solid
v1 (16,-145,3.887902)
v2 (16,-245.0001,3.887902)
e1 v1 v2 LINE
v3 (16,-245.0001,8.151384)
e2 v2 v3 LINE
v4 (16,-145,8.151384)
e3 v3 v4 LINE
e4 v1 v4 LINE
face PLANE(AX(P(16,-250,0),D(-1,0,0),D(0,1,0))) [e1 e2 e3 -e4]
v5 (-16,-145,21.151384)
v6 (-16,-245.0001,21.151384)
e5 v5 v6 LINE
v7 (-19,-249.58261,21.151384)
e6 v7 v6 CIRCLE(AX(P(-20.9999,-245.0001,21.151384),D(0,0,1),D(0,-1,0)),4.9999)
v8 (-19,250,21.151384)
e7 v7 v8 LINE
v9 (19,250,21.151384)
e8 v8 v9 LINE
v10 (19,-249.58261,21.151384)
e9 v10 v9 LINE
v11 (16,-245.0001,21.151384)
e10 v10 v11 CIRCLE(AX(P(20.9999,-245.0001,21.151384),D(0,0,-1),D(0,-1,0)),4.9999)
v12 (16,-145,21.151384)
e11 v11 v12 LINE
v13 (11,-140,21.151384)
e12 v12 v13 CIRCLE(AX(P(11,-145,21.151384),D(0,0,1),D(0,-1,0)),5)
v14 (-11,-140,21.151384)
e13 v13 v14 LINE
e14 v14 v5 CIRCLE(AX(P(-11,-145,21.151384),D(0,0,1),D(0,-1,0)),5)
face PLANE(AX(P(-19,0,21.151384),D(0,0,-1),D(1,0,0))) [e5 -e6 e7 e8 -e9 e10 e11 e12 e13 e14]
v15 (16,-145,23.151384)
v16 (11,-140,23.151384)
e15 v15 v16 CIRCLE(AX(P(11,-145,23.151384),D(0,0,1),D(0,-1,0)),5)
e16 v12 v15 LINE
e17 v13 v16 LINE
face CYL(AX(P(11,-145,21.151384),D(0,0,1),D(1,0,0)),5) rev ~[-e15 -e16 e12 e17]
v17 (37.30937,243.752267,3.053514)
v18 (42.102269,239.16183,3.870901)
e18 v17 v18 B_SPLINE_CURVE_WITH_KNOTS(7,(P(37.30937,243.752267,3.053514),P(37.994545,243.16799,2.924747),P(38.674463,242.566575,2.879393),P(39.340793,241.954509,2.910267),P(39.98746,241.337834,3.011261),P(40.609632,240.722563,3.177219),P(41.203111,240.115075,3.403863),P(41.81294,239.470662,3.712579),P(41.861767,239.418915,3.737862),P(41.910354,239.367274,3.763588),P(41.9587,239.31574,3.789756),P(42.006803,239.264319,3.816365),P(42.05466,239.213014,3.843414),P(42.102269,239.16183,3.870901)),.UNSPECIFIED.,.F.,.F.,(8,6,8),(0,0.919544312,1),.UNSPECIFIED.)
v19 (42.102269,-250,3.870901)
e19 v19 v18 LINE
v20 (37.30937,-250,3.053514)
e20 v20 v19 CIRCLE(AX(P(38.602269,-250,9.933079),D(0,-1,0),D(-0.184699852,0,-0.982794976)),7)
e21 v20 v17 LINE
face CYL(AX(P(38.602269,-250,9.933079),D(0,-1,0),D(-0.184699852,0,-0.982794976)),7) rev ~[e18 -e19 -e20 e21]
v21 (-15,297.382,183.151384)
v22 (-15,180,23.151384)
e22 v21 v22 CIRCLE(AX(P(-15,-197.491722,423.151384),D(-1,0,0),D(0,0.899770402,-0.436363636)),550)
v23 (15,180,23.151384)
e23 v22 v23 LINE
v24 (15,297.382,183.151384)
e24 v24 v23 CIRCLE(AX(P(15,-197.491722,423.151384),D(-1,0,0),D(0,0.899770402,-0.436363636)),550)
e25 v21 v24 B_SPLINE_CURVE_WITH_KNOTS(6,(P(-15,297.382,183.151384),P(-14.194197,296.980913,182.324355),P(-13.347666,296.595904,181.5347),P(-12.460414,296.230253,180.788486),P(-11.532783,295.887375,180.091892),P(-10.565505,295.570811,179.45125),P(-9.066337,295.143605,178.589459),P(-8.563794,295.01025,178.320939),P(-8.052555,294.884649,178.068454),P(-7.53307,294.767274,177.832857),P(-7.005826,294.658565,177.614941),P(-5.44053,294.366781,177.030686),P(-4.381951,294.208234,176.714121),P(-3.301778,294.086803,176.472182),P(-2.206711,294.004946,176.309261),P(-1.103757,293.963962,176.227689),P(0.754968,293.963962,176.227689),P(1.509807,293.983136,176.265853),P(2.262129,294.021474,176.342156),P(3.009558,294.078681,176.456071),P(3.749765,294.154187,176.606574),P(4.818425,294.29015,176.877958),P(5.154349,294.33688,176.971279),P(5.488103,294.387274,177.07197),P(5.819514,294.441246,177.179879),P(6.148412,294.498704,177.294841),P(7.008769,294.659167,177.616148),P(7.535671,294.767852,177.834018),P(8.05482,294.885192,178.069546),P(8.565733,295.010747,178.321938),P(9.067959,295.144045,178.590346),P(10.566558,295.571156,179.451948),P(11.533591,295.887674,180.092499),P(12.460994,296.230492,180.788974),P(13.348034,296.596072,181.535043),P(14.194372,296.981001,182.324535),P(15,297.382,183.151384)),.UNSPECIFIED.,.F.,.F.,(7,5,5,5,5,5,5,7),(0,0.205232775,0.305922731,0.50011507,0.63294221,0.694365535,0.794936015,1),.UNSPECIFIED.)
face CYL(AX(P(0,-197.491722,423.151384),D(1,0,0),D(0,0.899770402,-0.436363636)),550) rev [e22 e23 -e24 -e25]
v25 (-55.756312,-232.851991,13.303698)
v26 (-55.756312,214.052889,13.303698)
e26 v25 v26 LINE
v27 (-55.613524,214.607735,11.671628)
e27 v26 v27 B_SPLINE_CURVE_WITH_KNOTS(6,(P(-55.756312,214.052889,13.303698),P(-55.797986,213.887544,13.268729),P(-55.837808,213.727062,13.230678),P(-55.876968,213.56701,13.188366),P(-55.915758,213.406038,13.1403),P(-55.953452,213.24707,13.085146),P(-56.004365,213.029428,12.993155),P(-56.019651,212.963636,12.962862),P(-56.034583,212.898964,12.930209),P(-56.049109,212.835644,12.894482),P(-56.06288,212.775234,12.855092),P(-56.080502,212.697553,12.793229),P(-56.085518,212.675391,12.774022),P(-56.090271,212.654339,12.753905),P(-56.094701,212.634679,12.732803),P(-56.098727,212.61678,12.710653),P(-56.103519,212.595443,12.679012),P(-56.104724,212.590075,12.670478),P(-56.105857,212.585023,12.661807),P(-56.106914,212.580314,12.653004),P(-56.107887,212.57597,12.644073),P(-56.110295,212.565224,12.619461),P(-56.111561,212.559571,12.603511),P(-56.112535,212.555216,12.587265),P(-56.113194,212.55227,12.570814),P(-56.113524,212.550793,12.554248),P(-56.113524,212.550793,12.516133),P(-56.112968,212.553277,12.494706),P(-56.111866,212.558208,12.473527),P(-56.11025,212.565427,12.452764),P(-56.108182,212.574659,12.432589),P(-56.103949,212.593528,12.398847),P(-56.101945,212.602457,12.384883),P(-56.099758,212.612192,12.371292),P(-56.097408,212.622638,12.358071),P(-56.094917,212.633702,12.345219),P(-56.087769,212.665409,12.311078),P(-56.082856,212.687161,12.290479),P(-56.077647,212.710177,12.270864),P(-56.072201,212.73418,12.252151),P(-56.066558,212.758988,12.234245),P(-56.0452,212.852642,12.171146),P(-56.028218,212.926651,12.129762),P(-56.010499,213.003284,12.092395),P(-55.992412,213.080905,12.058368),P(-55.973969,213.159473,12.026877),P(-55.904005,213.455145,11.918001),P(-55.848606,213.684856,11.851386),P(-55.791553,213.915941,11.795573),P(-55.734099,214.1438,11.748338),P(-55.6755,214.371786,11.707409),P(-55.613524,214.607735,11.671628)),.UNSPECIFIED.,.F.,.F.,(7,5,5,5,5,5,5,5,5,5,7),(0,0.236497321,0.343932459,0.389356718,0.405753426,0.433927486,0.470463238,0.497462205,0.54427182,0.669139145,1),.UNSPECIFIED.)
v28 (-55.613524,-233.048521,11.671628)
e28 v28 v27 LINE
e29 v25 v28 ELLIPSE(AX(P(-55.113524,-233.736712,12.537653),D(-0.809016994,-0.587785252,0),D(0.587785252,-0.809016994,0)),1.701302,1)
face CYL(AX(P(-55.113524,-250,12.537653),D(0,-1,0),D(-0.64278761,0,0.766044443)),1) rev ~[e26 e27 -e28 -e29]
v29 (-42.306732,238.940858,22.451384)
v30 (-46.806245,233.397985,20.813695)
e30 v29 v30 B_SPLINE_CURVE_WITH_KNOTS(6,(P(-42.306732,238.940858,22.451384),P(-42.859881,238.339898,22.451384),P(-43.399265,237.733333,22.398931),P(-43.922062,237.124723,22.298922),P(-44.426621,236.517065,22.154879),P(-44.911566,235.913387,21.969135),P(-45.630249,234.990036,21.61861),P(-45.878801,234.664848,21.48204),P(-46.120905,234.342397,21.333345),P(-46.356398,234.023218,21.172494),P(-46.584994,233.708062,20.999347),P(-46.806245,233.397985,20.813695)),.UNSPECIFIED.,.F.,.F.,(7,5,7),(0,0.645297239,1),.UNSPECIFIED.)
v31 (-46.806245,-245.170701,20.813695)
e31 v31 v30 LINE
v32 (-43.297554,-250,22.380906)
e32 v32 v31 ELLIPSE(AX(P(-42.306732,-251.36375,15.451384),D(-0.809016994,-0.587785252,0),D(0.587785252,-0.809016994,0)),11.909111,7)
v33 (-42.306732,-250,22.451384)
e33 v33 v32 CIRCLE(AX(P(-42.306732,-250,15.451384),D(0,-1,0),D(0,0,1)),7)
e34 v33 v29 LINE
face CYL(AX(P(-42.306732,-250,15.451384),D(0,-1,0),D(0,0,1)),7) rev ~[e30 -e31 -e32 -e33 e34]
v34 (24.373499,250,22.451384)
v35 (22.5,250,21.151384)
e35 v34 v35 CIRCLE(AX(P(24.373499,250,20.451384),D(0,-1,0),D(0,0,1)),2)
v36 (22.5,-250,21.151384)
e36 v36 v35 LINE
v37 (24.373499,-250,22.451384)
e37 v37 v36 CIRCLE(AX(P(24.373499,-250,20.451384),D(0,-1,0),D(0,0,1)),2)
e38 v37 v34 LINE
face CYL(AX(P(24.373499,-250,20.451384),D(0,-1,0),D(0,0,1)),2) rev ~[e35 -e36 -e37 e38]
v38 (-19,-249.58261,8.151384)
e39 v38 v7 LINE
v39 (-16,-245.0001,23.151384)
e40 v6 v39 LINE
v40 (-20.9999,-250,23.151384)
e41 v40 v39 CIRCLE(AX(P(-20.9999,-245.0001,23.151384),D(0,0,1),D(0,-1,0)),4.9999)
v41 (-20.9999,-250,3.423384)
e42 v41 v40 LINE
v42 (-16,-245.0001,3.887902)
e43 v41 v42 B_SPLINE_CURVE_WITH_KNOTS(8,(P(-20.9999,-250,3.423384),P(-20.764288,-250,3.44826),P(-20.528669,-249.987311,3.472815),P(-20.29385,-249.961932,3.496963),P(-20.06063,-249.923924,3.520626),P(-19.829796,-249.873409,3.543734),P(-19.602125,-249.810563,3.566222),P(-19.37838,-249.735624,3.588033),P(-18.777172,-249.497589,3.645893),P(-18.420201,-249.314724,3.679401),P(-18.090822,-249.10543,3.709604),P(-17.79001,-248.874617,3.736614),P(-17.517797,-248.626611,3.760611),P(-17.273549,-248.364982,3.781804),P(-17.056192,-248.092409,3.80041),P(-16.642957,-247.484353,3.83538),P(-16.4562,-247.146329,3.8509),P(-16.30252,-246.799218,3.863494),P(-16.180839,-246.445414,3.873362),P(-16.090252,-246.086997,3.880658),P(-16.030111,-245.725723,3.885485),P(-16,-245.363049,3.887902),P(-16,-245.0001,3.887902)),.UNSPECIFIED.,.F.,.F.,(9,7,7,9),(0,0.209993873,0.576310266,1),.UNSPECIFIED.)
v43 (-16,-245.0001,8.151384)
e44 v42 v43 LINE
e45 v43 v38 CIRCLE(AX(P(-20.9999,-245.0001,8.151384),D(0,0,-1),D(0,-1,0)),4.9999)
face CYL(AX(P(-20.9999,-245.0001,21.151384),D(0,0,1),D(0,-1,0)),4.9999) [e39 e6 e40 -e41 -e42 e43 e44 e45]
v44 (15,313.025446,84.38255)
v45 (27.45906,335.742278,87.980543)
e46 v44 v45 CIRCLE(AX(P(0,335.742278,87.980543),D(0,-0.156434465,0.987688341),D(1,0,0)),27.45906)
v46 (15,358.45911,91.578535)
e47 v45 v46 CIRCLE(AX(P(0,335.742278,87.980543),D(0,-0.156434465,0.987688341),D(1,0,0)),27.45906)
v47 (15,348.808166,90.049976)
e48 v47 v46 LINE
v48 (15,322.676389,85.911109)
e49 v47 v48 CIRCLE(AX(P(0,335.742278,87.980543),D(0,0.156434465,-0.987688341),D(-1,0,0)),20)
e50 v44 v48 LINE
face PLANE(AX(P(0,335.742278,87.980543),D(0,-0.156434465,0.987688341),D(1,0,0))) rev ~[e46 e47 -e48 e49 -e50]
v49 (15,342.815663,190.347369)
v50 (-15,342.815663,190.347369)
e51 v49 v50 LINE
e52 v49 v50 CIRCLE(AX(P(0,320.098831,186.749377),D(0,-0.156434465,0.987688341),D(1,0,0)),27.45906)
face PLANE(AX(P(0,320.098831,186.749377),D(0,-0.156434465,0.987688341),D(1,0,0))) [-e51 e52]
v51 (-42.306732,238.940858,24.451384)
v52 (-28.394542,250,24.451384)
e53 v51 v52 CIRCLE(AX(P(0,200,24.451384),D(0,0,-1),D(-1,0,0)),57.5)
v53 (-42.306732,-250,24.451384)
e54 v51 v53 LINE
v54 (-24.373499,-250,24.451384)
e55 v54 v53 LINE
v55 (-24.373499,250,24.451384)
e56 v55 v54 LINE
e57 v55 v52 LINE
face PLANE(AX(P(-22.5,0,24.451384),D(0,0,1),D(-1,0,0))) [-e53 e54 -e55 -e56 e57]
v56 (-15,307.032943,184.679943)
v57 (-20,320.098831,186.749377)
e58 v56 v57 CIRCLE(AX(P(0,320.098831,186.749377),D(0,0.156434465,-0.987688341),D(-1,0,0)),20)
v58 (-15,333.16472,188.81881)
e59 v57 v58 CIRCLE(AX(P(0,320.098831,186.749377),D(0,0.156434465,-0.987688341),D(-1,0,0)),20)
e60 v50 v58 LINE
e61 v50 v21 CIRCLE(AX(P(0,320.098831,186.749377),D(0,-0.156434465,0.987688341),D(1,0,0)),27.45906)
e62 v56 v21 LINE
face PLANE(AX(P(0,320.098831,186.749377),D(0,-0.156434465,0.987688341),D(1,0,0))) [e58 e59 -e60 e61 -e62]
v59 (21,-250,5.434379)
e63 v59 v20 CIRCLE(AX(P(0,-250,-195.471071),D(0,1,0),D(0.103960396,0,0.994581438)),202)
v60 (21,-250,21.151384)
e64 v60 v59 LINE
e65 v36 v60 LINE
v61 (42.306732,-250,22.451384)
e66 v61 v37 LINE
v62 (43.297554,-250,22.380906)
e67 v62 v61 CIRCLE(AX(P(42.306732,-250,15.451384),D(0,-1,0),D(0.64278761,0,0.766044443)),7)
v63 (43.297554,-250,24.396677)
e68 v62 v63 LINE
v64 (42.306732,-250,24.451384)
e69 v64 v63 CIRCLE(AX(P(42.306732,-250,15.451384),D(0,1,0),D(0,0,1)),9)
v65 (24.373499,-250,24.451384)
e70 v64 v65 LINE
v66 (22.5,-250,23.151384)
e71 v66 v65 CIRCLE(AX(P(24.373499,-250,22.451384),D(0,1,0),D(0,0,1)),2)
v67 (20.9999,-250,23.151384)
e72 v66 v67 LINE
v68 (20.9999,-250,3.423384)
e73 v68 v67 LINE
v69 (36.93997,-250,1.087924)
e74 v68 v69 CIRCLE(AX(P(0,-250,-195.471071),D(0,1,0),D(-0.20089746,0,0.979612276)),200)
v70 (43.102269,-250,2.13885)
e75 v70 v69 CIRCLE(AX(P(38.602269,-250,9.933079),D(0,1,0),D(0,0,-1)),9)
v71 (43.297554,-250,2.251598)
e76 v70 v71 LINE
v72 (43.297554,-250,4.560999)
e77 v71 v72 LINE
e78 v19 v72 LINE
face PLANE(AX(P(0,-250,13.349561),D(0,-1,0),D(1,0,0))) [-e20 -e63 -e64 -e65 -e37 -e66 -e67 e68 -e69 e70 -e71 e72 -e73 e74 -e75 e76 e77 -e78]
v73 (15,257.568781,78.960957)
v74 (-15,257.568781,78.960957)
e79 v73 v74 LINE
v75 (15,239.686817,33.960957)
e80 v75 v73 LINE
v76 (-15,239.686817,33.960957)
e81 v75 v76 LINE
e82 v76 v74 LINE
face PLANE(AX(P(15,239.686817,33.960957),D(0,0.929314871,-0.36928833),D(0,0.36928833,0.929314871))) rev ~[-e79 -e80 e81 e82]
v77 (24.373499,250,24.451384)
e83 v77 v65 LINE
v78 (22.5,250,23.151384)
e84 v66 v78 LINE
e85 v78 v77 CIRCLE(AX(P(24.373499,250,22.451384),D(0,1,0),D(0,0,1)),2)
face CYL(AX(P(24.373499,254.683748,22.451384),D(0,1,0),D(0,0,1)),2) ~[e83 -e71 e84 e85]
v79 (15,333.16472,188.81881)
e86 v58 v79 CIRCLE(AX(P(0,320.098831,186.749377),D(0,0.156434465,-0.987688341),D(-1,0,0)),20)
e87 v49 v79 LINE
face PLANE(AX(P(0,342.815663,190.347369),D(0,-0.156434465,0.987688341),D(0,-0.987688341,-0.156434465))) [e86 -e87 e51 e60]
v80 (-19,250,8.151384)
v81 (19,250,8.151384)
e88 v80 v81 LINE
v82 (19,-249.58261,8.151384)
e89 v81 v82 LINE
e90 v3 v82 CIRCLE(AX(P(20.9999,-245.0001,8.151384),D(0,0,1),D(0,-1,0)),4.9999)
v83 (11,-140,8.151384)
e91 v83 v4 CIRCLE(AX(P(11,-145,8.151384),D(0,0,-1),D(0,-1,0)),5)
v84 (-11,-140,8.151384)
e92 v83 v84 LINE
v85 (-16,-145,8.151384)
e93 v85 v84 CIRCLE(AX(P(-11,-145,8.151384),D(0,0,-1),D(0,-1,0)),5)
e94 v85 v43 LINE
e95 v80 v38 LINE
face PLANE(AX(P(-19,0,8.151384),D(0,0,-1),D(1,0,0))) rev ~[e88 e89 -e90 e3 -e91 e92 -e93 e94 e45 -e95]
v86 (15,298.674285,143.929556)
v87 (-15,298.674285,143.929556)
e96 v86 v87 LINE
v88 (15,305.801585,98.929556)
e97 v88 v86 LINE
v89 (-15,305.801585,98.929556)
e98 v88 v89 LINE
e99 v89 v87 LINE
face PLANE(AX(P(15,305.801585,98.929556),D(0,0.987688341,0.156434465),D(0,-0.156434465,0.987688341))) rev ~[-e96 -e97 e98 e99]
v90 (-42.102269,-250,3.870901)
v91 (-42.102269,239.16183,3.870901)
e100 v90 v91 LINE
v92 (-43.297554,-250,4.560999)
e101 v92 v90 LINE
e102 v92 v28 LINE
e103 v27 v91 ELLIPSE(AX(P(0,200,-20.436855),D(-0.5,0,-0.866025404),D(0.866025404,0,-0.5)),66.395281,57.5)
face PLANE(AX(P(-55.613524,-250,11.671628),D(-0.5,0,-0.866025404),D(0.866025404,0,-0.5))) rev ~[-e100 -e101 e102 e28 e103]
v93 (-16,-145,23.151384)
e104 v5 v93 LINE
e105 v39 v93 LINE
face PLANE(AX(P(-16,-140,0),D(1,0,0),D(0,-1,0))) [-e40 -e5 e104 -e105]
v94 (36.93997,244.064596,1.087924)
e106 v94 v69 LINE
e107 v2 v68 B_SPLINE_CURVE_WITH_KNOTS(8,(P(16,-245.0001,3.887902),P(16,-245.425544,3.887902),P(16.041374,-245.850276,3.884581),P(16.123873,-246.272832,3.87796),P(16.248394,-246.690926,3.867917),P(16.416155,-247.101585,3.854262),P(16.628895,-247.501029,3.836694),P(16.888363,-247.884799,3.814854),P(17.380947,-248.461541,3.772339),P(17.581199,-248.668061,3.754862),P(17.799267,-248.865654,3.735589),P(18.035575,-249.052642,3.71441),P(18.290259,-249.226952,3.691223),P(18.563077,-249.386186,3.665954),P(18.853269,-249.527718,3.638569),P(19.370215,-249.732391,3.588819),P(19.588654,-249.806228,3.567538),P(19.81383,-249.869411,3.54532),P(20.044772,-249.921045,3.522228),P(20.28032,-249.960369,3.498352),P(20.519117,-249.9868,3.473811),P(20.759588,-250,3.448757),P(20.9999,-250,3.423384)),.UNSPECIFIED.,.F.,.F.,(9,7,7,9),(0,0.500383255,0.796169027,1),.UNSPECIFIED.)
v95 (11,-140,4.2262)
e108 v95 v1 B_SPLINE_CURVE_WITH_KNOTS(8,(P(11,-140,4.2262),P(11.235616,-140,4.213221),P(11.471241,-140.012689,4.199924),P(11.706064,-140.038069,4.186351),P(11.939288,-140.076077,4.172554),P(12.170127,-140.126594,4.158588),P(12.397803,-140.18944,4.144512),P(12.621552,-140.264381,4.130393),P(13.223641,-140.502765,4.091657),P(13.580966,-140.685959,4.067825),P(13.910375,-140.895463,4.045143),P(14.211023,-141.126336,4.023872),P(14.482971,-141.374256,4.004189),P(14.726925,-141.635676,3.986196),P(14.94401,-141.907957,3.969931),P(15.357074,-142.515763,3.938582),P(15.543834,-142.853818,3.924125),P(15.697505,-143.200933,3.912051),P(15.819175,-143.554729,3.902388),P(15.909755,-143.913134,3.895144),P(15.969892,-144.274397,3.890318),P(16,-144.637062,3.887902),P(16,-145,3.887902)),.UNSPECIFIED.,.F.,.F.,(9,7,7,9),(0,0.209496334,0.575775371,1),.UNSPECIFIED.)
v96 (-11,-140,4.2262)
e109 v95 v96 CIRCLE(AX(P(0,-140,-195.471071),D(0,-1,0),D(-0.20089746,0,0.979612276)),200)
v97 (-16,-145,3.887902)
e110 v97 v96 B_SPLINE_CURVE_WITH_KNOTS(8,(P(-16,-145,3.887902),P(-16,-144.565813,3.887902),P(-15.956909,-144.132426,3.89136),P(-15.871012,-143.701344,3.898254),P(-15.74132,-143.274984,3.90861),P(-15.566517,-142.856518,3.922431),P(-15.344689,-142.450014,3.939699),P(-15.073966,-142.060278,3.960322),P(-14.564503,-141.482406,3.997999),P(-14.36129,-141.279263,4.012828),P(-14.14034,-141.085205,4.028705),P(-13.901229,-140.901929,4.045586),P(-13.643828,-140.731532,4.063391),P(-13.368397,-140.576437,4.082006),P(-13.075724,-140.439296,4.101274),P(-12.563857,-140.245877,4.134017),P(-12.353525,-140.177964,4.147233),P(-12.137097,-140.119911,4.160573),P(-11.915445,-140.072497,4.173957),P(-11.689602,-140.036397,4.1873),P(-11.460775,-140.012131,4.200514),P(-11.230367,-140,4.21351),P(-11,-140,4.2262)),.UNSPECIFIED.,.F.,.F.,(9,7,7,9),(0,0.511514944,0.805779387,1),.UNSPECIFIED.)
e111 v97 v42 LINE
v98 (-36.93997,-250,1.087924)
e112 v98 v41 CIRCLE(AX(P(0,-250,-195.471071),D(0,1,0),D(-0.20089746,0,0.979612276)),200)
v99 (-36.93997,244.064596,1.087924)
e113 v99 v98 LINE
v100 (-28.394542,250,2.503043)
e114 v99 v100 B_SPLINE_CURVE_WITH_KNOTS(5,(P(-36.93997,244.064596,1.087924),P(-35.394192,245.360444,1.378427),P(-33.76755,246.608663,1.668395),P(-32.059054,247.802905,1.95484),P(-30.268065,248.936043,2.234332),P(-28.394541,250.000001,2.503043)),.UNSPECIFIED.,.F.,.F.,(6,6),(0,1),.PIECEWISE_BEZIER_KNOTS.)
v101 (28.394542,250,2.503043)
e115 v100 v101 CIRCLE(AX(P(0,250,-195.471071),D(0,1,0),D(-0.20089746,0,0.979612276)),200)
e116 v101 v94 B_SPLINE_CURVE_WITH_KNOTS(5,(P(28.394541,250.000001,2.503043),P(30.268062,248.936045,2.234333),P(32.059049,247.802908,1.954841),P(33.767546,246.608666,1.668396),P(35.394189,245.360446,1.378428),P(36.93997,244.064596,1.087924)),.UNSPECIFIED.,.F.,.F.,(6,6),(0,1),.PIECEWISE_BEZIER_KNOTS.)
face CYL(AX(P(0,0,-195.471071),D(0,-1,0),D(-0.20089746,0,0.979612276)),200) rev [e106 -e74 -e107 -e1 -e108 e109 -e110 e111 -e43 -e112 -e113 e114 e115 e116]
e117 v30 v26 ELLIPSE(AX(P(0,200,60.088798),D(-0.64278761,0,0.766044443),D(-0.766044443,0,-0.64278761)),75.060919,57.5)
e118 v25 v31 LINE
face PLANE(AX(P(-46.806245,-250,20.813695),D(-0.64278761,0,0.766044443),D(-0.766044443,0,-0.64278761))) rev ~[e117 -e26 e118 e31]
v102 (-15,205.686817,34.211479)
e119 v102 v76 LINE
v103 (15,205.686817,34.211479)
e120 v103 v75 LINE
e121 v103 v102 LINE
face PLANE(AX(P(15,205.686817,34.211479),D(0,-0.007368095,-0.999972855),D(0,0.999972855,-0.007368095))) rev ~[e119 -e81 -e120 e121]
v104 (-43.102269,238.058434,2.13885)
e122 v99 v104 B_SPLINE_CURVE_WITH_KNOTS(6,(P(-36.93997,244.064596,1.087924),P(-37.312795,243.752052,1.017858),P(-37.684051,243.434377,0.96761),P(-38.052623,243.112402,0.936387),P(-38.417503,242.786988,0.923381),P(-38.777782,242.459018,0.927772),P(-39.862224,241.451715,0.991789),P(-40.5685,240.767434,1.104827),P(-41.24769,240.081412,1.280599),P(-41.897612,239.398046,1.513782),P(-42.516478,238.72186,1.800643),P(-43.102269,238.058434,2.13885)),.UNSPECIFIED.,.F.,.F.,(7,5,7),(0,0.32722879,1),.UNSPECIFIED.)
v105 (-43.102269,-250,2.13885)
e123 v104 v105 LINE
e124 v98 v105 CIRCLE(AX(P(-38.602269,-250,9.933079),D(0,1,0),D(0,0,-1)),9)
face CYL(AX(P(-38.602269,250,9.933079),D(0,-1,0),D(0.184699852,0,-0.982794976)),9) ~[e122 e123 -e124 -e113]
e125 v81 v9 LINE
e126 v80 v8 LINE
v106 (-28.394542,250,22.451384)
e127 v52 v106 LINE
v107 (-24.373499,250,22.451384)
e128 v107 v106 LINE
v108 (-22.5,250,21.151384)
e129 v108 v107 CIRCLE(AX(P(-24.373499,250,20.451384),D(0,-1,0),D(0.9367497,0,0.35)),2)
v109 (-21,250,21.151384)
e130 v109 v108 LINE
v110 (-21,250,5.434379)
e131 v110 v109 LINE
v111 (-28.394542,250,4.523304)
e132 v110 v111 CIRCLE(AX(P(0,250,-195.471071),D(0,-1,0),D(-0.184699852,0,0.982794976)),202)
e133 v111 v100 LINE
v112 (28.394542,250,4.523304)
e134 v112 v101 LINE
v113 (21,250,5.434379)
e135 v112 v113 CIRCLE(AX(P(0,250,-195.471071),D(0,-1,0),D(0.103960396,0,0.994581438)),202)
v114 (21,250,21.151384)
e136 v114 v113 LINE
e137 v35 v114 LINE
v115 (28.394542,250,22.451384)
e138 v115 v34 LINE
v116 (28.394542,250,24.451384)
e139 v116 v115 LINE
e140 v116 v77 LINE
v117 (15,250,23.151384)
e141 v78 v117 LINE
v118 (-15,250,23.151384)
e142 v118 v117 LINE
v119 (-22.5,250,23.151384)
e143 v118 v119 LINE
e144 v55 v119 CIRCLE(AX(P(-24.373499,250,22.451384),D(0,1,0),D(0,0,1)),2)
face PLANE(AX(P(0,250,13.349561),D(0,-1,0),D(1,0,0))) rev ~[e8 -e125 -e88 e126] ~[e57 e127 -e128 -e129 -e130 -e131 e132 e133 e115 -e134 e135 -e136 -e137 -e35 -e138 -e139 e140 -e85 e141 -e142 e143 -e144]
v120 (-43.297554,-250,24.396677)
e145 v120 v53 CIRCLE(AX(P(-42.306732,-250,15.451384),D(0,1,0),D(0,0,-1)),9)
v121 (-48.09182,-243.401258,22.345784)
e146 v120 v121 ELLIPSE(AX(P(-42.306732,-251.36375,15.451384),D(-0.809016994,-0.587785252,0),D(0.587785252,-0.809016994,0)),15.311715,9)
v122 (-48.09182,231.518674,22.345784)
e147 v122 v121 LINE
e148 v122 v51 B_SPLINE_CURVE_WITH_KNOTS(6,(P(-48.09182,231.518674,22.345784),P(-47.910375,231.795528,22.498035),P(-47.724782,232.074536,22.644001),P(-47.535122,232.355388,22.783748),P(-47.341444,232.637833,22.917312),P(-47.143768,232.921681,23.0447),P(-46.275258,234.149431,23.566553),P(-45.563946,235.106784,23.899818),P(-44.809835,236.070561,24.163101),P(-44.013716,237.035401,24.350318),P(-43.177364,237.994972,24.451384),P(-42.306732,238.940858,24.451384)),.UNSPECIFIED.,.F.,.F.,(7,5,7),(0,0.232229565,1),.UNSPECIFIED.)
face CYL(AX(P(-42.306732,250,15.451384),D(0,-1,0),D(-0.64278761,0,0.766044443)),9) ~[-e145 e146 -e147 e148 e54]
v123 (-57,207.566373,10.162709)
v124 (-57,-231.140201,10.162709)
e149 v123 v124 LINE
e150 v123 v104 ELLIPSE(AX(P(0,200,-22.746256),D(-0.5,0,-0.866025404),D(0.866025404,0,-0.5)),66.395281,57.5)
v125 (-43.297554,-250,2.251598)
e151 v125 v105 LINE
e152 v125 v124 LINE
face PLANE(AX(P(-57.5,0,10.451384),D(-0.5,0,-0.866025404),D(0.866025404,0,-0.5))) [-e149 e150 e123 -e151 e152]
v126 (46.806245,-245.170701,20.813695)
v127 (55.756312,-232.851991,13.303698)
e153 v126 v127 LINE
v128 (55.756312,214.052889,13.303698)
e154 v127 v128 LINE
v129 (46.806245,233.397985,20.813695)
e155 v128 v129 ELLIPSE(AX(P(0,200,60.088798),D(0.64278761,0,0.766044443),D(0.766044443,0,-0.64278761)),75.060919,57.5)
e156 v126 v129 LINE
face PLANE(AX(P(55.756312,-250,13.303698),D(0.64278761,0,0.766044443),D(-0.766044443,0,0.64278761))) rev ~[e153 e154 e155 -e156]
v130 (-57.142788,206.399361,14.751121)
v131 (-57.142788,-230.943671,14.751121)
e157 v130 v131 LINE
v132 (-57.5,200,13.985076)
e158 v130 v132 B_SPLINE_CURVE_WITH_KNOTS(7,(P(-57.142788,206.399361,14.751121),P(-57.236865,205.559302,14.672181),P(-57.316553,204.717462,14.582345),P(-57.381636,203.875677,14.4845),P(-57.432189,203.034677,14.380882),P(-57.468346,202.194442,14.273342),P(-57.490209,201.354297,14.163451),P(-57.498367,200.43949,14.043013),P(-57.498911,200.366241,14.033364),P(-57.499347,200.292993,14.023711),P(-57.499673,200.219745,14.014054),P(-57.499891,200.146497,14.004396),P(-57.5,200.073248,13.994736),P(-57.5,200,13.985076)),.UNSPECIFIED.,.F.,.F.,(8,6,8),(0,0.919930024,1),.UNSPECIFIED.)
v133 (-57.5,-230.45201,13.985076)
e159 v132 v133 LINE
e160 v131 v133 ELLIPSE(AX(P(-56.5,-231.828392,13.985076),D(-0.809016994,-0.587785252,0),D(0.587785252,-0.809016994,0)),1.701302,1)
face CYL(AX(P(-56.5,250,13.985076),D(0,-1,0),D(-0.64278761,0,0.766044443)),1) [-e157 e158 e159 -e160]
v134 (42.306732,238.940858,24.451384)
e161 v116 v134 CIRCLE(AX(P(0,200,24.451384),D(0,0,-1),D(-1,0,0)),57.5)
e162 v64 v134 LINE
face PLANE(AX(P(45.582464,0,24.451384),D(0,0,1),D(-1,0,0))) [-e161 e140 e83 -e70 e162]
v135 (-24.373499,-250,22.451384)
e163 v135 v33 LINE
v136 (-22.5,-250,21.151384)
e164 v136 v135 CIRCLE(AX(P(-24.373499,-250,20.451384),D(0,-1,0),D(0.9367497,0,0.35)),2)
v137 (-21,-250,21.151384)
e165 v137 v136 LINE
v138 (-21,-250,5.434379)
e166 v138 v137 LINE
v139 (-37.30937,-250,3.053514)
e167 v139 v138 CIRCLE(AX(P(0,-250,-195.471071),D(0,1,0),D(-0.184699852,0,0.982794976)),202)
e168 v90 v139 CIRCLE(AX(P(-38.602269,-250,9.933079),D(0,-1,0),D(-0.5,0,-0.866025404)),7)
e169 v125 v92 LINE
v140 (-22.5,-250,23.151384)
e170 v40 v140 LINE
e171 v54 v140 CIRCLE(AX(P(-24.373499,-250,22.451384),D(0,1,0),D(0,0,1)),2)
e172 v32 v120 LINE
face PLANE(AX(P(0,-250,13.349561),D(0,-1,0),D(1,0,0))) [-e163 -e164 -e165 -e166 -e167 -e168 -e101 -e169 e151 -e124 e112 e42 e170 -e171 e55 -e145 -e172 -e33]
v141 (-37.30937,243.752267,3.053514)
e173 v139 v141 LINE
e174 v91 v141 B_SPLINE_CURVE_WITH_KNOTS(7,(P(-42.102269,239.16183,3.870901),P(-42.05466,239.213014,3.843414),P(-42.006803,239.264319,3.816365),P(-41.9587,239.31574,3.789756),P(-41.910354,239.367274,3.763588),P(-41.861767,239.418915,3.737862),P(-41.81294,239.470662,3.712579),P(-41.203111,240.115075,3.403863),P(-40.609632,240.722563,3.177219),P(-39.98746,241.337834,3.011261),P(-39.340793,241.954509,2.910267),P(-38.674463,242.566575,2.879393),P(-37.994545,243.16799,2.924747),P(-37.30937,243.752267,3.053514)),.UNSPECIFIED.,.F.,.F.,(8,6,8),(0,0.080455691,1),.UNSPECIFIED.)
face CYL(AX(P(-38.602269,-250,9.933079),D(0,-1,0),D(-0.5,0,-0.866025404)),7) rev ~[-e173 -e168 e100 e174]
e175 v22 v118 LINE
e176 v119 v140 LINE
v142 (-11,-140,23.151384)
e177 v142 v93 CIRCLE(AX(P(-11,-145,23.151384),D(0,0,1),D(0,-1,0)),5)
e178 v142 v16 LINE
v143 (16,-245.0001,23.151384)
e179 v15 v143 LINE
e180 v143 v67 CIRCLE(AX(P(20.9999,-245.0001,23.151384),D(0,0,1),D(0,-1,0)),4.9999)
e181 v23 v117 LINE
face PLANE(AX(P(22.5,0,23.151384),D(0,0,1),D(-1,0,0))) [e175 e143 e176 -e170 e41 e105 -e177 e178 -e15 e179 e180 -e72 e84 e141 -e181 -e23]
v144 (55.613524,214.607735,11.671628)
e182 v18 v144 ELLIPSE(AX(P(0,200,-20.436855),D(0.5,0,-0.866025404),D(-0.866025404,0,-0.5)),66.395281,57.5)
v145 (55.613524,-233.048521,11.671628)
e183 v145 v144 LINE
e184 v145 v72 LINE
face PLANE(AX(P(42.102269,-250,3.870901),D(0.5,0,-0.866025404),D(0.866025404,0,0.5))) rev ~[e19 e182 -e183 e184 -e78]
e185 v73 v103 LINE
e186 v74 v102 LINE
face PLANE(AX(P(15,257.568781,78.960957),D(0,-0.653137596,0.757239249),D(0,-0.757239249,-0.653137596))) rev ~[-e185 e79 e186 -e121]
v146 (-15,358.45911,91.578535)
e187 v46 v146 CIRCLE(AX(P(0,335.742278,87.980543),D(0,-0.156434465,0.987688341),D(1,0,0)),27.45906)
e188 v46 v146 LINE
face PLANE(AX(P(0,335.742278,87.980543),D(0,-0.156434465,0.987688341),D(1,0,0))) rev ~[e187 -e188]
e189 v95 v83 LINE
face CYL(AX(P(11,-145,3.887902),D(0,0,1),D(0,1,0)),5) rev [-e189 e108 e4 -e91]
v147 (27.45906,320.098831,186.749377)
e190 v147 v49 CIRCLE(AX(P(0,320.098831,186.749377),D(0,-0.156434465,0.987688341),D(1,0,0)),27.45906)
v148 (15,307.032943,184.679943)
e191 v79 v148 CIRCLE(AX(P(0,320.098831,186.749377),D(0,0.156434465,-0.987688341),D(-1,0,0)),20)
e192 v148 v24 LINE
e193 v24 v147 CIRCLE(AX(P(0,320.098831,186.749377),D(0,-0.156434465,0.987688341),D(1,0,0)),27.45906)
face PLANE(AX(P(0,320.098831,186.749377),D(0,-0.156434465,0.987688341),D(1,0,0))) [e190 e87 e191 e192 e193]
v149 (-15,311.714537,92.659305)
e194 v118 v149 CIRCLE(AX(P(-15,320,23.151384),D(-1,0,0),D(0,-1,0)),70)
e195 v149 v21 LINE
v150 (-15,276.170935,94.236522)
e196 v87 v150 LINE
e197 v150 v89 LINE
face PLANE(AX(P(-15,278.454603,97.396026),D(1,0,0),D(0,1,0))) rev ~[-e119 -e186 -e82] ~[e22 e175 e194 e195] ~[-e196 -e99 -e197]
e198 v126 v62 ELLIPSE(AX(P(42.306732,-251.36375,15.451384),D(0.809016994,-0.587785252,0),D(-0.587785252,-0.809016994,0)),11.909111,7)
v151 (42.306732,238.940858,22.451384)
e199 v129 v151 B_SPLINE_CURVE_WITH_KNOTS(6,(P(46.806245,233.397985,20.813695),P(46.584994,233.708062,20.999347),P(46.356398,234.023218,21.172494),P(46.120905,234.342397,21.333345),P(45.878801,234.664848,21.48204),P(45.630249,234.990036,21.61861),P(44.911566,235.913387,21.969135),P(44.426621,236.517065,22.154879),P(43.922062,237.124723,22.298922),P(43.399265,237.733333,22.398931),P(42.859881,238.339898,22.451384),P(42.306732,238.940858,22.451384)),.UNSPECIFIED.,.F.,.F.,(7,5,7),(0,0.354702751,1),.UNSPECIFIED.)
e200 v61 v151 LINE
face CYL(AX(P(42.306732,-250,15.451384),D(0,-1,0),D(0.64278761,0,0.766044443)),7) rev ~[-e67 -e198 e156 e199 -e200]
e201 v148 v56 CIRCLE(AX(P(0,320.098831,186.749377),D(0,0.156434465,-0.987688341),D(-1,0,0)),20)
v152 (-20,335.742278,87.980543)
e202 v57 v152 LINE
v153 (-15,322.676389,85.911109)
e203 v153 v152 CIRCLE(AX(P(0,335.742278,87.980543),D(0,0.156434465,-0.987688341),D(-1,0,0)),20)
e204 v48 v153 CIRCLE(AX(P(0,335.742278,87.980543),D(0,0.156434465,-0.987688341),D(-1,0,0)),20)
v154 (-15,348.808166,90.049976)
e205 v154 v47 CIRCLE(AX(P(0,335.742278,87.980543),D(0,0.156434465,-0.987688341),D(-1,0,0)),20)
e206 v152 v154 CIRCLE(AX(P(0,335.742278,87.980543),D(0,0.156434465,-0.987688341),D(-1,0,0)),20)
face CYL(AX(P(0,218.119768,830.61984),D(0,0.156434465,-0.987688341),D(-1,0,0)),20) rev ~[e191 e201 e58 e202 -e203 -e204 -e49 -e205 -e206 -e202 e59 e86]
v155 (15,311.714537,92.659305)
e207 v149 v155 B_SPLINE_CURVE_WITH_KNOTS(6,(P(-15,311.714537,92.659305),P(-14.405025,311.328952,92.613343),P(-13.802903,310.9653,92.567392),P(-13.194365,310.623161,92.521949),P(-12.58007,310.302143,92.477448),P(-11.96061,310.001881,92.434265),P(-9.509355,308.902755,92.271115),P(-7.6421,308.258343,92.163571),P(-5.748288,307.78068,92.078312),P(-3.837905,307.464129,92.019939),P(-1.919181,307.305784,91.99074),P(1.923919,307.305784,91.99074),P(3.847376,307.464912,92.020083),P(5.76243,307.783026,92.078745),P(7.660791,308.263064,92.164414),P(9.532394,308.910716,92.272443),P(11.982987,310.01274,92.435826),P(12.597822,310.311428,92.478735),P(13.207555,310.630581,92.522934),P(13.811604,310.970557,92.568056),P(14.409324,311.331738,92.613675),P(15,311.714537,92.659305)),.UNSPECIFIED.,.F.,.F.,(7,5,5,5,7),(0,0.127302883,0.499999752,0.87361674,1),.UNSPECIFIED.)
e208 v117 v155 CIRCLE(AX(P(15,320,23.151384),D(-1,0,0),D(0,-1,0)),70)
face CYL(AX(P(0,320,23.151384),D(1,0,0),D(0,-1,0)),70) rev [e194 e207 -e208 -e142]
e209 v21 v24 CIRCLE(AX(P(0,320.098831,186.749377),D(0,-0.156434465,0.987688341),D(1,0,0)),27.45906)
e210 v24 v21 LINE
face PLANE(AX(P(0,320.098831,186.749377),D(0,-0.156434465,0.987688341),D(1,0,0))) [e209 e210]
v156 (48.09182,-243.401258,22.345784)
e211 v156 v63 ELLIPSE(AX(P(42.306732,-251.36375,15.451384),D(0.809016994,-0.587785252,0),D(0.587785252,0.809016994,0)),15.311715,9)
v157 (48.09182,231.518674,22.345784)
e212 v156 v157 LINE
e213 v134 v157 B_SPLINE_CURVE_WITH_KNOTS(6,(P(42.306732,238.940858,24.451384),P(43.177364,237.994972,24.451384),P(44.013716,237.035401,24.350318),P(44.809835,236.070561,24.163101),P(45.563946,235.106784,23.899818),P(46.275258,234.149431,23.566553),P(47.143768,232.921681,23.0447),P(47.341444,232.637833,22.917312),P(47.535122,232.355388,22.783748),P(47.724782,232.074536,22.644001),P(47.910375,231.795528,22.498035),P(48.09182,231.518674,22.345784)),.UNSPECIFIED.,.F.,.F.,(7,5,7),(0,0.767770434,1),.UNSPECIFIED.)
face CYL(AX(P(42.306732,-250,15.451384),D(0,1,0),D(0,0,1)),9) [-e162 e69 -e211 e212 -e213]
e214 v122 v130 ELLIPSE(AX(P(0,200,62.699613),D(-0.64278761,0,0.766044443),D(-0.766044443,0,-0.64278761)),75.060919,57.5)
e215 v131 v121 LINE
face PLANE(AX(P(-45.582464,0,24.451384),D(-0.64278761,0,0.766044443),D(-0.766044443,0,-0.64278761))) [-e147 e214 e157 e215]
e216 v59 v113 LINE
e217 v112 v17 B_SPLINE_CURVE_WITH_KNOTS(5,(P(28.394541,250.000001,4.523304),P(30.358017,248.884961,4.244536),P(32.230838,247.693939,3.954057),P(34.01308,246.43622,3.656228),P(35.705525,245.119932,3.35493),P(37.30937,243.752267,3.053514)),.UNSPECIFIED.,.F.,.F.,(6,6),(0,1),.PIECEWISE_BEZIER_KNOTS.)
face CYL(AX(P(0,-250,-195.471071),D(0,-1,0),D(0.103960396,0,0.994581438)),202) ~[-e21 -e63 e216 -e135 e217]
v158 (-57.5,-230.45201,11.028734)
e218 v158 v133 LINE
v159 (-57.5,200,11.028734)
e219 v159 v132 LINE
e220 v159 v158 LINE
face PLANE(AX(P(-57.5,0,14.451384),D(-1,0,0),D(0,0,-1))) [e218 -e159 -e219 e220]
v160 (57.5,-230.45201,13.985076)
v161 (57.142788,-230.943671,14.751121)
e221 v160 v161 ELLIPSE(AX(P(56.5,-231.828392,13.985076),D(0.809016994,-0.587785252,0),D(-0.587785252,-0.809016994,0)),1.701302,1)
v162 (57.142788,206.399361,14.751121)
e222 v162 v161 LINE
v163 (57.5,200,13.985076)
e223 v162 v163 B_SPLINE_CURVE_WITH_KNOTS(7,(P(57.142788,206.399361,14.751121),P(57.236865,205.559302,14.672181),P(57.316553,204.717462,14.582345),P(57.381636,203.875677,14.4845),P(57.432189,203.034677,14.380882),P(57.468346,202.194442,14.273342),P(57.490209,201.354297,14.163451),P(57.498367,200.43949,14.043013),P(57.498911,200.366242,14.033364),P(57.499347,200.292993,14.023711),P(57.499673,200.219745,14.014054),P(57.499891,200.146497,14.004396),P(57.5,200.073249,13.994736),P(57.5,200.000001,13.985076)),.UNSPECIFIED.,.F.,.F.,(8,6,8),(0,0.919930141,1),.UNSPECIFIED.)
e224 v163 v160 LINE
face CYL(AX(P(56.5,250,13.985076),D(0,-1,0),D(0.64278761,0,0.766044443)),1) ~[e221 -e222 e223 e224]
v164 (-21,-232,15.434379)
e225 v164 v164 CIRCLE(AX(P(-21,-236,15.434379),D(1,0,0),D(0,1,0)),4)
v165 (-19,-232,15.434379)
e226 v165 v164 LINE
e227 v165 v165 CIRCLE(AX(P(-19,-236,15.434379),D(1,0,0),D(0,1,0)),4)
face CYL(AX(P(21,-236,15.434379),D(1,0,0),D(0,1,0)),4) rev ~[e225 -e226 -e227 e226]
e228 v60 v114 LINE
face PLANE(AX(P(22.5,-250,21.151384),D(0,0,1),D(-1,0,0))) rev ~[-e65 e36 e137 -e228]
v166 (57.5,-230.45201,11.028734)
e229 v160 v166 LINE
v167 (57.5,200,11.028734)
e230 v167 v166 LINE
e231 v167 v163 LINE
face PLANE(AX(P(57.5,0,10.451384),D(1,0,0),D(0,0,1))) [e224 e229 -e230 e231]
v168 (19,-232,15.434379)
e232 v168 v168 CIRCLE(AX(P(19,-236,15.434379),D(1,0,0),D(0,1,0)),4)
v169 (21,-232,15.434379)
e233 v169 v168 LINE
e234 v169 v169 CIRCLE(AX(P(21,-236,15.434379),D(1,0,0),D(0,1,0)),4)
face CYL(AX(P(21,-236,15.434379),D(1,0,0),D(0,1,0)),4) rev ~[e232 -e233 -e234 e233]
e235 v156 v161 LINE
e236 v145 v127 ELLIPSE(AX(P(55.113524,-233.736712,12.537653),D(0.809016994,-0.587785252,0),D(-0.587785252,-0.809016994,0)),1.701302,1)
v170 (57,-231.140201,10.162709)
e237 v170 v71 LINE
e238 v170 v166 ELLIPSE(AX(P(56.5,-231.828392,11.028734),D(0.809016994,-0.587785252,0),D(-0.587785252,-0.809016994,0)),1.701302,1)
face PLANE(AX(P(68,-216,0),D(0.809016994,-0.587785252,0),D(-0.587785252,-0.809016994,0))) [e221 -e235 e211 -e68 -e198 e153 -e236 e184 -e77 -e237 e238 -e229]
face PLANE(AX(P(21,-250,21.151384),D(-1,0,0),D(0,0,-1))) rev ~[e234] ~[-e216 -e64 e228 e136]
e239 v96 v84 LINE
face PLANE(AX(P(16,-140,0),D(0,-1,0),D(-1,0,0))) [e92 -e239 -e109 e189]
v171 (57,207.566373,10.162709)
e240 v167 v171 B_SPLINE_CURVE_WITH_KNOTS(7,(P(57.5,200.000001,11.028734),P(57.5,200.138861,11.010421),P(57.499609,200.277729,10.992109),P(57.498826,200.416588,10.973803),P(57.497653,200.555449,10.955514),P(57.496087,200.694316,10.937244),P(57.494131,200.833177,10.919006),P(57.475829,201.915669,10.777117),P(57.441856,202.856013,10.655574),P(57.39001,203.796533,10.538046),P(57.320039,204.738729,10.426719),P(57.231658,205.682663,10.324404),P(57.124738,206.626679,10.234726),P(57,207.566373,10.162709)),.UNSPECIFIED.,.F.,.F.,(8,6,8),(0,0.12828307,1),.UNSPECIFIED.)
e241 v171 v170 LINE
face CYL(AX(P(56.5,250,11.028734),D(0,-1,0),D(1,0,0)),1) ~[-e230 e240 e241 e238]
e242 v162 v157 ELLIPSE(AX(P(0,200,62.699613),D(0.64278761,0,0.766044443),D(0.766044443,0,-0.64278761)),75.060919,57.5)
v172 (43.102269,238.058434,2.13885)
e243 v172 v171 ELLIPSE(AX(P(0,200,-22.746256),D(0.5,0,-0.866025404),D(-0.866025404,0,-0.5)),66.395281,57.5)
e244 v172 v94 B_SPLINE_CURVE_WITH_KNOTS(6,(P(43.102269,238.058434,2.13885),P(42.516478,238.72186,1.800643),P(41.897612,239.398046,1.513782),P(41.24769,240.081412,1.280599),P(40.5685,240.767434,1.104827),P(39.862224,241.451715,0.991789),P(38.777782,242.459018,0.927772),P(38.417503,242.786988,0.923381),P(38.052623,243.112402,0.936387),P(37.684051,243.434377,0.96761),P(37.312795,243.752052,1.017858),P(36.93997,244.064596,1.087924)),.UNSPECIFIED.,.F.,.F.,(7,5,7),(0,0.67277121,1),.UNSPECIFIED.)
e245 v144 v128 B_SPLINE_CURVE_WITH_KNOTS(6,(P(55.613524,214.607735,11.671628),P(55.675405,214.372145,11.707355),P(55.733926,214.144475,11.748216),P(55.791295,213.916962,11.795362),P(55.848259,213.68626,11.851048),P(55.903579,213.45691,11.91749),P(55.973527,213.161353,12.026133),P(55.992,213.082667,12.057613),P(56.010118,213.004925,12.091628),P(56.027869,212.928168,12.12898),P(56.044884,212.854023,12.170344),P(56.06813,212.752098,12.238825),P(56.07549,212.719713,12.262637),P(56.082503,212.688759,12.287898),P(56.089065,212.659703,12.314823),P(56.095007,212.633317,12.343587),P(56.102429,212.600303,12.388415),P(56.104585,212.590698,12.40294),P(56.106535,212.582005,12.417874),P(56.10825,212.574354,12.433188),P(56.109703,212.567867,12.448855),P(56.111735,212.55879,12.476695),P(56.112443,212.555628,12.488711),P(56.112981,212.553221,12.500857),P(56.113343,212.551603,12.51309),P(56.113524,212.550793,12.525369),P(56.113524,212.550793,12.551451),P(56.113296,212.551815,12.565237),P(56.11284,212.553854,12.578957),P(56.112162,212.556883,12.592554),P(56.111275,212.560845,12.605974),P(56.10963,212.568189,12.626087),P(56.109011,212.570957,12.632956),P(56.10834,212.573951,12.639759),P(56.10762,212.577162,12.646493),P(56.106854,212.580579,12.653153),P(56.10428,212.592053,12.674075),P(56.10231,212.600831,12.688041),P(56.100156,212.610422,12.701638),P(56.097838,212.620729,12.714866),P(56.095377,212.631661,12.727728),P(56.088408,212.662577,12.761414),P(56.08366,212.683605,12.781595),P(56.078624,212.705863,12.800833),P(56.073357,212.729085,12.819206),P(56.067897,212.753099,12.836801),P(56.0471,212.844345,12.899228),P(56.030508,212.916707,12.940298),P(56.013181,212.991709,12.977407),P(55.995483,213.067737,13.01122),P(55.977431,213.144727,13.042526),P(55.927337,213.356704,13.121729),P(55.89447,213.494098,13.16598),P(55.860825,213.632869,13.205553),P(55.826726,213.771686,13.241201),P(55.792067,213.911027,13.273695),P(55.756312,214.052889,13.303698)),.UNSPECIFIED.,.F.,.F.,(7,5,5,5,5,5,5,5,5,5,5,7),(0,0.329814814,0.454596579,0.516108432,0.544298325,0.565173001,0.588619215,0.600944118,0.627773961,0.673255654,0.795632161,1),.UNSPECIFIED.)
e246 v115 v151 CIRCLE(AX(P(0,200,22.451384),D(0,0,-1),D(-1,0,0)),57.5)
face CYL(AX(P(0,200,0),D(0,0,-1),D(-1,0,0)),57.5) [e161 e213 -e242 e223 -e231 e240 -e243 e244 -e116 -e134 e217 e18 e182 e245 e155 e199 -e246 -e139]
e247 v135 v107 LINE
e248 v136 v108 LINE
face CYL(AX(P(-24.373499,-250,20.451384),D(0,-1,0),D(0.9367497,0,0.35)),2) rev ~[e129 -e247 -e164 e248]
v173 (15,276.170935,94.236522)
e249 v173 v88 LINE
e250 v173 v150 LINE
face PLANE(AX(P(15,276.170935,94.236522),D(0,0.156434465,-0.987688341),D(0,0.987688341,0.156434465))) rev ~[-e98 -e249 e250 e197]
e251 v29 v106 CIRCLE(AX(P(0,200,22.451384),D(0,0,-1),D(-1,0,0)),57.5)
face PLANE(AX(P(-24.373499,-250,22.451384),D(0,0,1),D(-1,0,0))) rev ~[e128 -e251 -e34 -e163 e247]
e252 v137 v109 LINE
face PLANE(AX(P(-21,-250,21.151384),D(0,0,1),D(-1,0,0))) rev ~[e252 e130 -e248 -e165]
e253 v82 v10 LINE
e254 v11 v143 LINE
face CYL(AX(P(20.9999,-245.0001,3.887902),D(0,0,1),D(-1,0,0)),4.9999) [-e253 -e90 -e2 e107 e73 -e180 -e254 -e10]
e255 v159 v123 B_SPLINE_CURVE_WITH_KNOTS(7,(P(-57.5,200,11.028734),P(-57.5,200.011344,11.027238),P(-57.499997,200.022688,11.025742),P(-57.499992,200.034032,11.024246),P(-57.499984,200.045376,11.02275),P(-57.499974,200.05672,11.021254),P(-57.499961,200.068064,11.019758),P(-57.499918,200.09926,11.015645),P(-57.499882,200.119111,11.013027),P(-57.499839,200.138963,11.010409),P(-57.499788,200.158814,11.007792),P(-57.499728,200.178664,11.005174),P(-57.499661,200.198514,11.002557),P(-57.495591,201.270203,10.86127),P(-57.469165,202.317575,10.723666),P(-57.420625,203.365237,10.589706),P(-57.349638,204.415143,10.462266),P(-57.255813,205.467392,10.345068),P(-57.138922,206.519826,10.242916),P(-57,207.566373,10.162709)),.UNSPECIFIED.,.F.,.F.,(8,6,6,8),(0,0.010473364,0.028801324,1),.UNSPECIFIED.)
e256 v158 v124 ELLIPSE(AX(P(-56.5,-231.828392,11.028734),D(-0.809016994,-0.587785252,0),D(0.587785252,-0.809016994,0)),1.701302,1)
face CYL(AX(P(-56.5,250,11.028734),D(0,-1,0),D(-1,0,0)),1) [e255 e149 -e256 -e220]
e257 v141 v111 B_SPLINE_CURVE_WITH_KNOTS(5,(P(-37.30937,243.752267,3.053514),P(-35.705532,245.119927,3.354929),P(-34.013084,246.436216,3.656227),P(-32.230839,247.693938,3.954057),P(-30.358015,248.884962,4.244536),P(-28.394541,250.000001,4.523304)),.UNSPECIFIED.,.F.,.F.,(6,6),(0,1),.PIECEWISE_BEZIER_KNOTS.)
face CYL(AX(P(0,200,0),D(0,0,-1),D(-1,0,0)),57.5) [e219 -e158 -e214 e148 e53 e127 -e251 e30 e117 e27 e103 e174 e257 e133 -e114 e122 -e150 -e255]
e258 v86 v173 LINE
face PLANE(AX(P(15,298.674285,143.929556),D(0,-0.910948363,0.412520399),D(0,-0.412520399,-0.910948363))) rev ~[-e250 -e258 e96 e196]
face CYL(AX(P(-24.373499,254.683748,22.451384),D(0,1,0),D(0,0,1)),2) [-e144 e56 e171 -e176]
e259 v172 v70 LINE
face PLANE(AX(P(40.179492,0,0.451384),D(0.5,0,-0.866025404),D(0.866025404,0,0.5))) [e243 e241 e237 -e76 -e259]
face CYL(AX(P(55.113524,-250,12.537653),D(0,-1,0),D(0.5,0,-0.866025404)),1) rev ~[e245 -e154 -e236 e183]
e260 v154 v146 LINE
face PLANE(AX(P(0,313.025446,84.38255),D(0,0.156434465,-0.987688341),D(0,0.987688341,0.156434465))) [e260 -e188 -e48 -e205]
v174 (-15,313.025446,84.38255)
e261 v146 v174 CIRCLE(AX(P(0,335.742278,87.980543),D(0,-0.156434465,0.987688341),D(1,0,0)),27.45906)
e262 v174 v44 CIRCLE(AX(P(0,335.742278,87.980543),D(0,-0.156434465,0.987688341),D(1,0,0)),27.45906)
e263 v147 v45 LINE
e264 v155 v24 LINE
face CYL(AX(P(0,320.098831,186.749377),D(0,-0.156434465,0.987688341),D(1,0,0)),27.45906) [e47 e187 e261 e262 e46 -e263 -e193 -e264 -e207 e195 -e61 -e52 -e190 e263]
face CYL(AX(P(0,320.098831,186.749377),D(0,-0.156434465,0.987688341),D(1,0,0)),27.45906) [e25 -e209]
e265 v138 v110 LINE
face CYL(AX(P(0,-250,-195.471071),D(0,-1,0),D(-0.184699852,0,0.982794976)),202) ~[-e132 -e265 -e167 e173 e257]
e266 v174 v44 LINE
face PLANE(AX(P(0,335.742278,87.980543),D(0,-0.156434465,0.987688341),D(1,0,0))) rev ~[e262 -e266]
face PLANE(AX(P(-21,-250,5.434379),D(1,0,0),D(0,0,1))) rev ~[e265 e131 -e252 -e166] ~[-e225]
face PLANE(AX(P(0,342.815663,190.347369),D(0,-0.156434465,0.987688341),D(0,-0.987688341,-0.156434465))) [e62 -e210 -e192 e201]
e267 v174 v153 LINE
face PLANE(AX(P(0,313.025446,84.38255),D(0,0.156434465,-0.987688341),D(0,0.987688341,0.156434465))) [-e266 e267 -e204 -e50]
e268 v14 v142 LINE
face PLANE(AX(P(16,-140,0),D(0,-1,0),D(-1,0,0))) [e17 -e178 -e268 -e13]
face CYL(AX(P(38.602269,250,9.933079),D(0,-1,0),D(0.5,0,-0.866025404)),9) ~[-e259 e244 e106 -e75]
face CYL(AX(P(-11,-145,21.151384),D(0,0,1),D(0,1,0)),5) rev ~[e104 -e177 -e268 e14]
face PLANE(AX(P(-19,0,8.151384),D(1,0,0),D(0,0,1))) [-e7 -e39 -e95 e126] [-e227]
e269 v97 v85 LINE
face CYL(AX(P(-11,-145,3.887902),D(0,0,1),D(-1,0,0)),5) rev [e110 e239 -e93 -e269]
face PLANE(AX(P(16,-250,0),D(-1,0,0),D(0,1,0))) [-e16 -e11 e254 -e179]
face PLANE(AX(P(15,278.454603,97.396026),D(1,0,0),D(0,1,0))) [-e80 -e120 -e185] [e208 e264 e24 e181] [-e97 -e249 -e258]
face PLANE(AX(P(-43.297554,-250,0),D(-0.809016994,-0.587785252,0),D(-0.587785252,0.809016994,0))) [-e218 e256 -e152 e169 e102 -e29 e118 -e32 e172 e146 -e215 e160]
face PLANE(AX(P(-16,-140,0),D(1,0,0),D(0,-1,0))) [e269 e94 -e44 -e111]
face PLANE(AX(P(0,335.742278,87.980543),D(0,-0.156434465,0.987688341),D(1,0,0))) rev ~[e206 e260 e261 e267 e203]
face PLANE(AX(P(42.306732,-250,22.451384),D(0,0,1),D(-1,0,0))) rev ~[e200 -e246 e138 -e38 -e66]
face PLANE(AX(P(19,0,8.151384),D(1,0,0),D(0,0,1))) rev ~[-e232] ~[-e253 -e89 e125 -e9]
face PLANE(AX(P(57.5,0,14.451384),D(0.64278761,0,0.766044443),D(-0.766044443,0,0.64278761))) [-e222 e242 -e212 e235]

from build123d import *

# Parameters (mm, degrees)
F1_DEPTH       = 250
F2_W           = 38
F2_H           = 13
F3_DEPTH       = 250
F4_T1_DEPTH    = 509.3674969976
F5_R           = 9
F6_R           = 1
F8_DEPTH       = 500.001
F10_DEPTH      = 24.4523840141
F10_DEPTH_BACK = 527
F12_DEPTH      = 527
F12_DEPTH_BACK = 24.4523841141
F13_F1_R       = 4.9999
F13_F2_R       = 4.9999
F13_F3_R       = 5
F13_F4_R       = 5
F13_F5_R       = 5
F13_F6_R       = 5
F15_DEPTH      = 15
F16_R          = 27.4590604355
F17_DEPTH      = 100
F19_D          = 40
F21_D          = 8
F21_DEPTH      = 50
F21_TIP        = 2.4034424761
F23_DEPTH      = 72.5010001


# Not quite as in the source:
# - a fillet or chamfer that OpenCascade refuses, or shapes differently, is made with other operations: its cross-section is extruded or revolved along the edge and cut away or added
# - a fillet or chamfer is up to 0.001 mm smaller than in the source, because OpenCascade refuses the exact size
# - an extrude ends at something that could not be found from the text; its depth is read off the source's solid


with BuildPart() as f1:
    # F0 (on Front) → F1 (new body, symmetric)
    with BuildSketch(Plane.XZ):
        with BuildLine():
            Line((22.5, 23.1513840141), (0, 23.1513840141))
            Line((0, 23.1513840141), (-22.5, 23.1513840141))
            Line((-22.5, 23.1513840141), (-22.5, 24.4513840141))
            Line((-22.5, 24.4513840141), (-45.5824640741, 24.4513840141))
            Line((-45.5824640741, 24.4513840141), (-57.5, 14.4513840141))
            Line((-57.5, 14.4513840141), (-57.5, 10.4513840141))
            Line((-57.5, 10.4513840141), (-40.1794919243, 0.4513840141))
            ThreePointArc((-40.1794919243, 0.4513840141), (0, 4.5289288725), (40.1794919243, 0.4513840141))
            Line((40.1794919243, 0.4513840141), (57.5, 10.4513840141))
            Line((57.5, 10.4513840141), (57.5, 14.4513840141))
            Line((57.5, 14.4513840141), (45.5824640741, 24.4513840141))
            Line((45.5824640741, 24.4513840141), (22.5, 24.4513840141))
            Line((22.5, 24.4513840141), (22.5, 23.1513840141))
        make_face()
    extrude(amount=F1_DEPTH, both=True)

    # F2 (on Front) → F3 (cut, symmetric)
    with BuildSketch(Plane.XZ):
        with Locations((0, 14.6513840141)):
            Rectangle(F2_W, F2_H)
    extrude(amount=F3_DEPTH, both=True, mode=Mode.SUBTRACT)

    # F4: fillet of radius 2 on 2 edges, made by hand

    # F4_s2 → F4_t1 (cut)
    with BuildSketch(Plane.XZ.offset(-254.6837484988)):
        with BuildLine():
            ThreePointArc((-24.3734993995, 24.4513840141), (-23.2333239744, 24.0945516866), (-22.5, 23.1513840141))
            Line((-22.5, 23.1513840141), (-22.5, 24.4513840141))
            Line((-22.5, 24.4513840141), (-24.3734993995, 24.4513840141))
        make_face()
        with BuildLine():
            ThreePointArc((24.3734993995, 24.4513840141), (23.2333239744, 24.0945516866), (22.5, 23.1513840141))
            Line((22.5, 23.1513840141), (22.5, 24.4513840141))
            Line((22.5, 24.4513840141), (24.3734993995, 24.4513840141))
        make_face()
    extrude(amount=F4_T1_DEPTH, mode=Mode.SUBTRACT)

    # F5
    f5_edges = [f1.edges().sort_by_distance(p)[0] for p in [
        (-45.582464, 0, 24.451384),
        (-40.179492, 0, 0.451384),
        (40.179492, 0, 0.451384),
        (45.582464, 0, 24.451384),
    ]]
    fillet(f5_edges, radius=F5_R)

    # F6
    f6_edges = [f1.edges().sort_by_distance(p)[0] for p in [
        (57.5, 0, 14.451384),
        (57.5, 0, 10.451384),
        (-57.5, 0, 10.451384),
        (-57.5, 0, 14.451384),
    ]]
    fillet(f6_edges, radius=F6_R)

    # F7 (on face) → F8 (cut, through all)
    with BuildSketch(Plane.XZ.offset(250)):
        with BuildLine():
            ThreePointArc((-42.1022690923, 3.8709010064), (-39.7790673433, 3.0327059534), (-37.3093701274, 3.0535140017))
            ThreePointArc((-37.3093701274, 3.0535140017), (-29.1789785809, 4.4103617496), (-21, 5.4343792715))
            Line((-21, 5.4343792715), (-21, 21.1513840141))
            Line((-21, 21.1513840141), (-22.5, 21.1513840141))
            ThreePointArc((-22.5, 21.1513840141), (-23.2333239744, 22.0945516866), (-24.3734993995, 22.4513840141))
            Line((-24.3734993995, 22.4513840141), (-42.3067319657, 22.4513840141))
            ThreePointArc((-42.3067319657, 22.4513840141), (-44.7008729689, 22.0292323596), (-46.8062452335, 20.813695116))
            Line((-46.8062452335, 20.813695116), (-55.7563117574, 13.3036975967))
            ThreePointArc((-55.7563117574, 13.3036975967), (-56.1097188459, 12.4504974108), (-55.6135241478, 11.6716277498))
            Line((-55.6135241478, 11.6716277498), (-42.1022690923, 3.8709010064))
        make_face()
        with BuildLine():
            Line((21, 21.1513840141), (21, 5.4343792715))
            ThreePointArc((21, 5.4343792715), (29.1789785809, 4.4103617496), (37.3093701274, 3.0535140017))
            ThreePointArc((37.3093701274, 3.0535140017), (39.7790673433, 3.0327059534), (42.1022690923, 3.8709010064))
            Line((42.1022690923, 3.8709010064), (55.6135241478, 11.6716277498))
            ThreePointArc((55.6135241478, 11.6716277498), (56.1097188459, 12.4504974108), (55.7563117574, 13.3036975967))
            Line((55.7563117574, 13.3036975967), (46.8062452335, 20.813695116))
            ThreePointArc((46.8062452335, 20.813695116), (44.7008729689, 22.0292323596), (42.3067319657, 22.4513840141))
            Line((42.3067319657, 22.4513840141), (24.3734993995, 22.4513840141))
            ThreePointArc((24.3734993995, 22.4513840141), (23.2333239744, 22.0945516866), (22.5, 21.1513840141))
            Line((22.5, 21.1513840141), (21, 21.1513840141))
        make_face()
    extrude(amount=-F8_DEPTH, mode=Mode.SUBTRACT)

    # F9 (on Top) → F10 (cut, two sides)
    with BuildSketch(Plane.XY) as f10_sk:
        with BuildLine():
            ThreePointArc((-57.5, 200), (0, 257.5), (57.5, 200))
            Line((57.5, 200), (57.5, 280))
            Line((57.5, 280), (-57.5, 280))
            Line((-57.5, 280), (-57.5, 200))
        make_face()
    extrude(amount=F10_DEPTH, mode=Mode.SUBTRACT)
    extrude(f10_sk.sketch, amount=-F10_DEPTH_BACK, mode=Mode.SUBTRACT)

    # F11 (on Top) → F12 (cut, two sides)
    with BuildSketch(Plane.XY) as f12_sk:
        Polygon((-43.2975540478, -250), (-68, -216), (-68, -346), (68, -346), (68, -216), (43.2975540478, -250), (16, -250), (16, -140), (-16, -140), (-16, -250), align=None)
    extrude(amount=-F12_DEPTH, mode=Mode.SUBTRACT)
    extrude(f12_sk.sketch, amount=F12_DEPTH_BACK, mode=Mode.SUBTRACT)

    # F13: fillet of radius 5 on 8 edges, made by hand

    # F13_f1 (radius 5 in the source; OpenCascade refuses exactly that, so slightly less here)
    f13_f1_edges = [f1.edges().sort_by_distance(p)[0] for p in [
        (-16, -250, 22.1513840141),
    ]]
    fillet(f13_f1_edges, radius=F13_F1_R)

    # F13_f2 (radius 5 in the source; OpenCascade refuses exactly that, so slightly less here)
    f13_f2_edges = [f1.edges().sort_by_distance(p)[0] for p in [
        (16, -250, 6.0196427984),
    ]]
    fillet(f13_f2_edges, radius=F13_F2_R)

    # F13_f3
    f13_f3_edges = [f1.edges().sort_by_distance(p)[0] for p in [
        (16, -140, 22.1513840141),
    ]]
    fillet(f13_f3_edges, radius=F13_F3_R)

    # F13_f4
    f13_f4_edges = [f1.edges().sort_by_distance(p)[0] for p in [
        (-16, -140, 22.1513840141),
    ]]
    fillet(f13_f4_edges, radius=F13_F4_R)

    # F13_f5
    f13_f5_edges = [f1.edges().sort_by_distance(p)[0] for p in [
        (-16, -140, 6.0196427984),
    ]]
    fillet(f13_f5_edges, radius=F13_F5_R)

    # F13_f6
    f13_f6_edges = [f1.edges().sort_by_distance(p)[0] for p in [
        (16, -140, 6.0196427984),
    ]]
    fillet(f13_f6_edges, radius=F13_F6_R)

    # F14 (on Right) → F15 (join, symmetric)
    with BuildSketch(Plane.YZ):
        with BuildLine():
            ThreePointArc((297.3819995028, 183.1513840141), (245.9666940414, 97.8136618671), (180, 23.1513840141))
            Line((180, 23.1513840141), (250, 23.1513840141))
            ThreePointArc((250, 23.1513840141), (267.6550746197, 69.6272787008), (311.7145367693, 92.6593051387))
            Line((311.7145367693, 92.6593051387), (313.0254460068, 84.3825499546))
            Line((313.0254460068, 84.3825499546), (358.4591096742, 91.5785353465))
            Line((358.4591096742, 91.5785353465), (342.8156631702, 190.347369406))
            Line((342.8156631702, 190.347369406), (297.3819995028, 183.1513840141))
        make_face()
    extrude(amount=F15_DEPTH, both=True)

    # F16 (on face) → F17 (join, through all)
    with BuildSketch(Plane(origin=(0, -21.0209895784, 132.7213047908), x_dir=(1, 0, 0), z_dir=(0, -0.156434465, 0.9876883406))):
        with Locations((0, 345.3719223914)):
            Circle(F16_R)
    extrude(amount=-F17_DEPTH)

    # F19 (through all)
    with Locations(Plane(origin=(0, -21.0209895784, 132.7213047908), x_dir=(1, 0, 0), z_dir=(0, -0.156434465, 0.9876883406))):
        with Locations((0, 345.3719223914)):
            Hole(F19_D / 2)

    # F21 (one way)
    with BuildSketch(Plane.YZ.offset(21)):
        with Locations((-236, 15.4343792715)):
            Circle(F21_D / 2)
    extrude(amount=-F21_DEPTH, mode=Mode.SUBTRACT)
    with Locations(Plane.YZ.offset(21)):
        with Locations((-236, 15.4343792715)):
            with Locations((0, 0, -(F21_DEPTH + F21_TIP / 2))):  # 118° drill point
                Cone(0, F21_D / 2, F21_TIP, mode=Mode.SUBTRACT)

    # F22 (on face) → F23 (cut, through all)
    with BuildSketch(Plane.YZ.offset(15)):
        Polygon((205.6868169308, 34.2114791274), (239.6868169308, 33.9609570801), (257.5687806787, 78.9609570801), align=None)
        Polygon((305.8015852264, 98.9295560122), (298.6742854118, 143.9295560122), (276.1709350086, 94.2365220609), align=None)
    extrude(amount=-F23_DEPTH, mode=Mode.SUBTRACT)


solid = f1.part
